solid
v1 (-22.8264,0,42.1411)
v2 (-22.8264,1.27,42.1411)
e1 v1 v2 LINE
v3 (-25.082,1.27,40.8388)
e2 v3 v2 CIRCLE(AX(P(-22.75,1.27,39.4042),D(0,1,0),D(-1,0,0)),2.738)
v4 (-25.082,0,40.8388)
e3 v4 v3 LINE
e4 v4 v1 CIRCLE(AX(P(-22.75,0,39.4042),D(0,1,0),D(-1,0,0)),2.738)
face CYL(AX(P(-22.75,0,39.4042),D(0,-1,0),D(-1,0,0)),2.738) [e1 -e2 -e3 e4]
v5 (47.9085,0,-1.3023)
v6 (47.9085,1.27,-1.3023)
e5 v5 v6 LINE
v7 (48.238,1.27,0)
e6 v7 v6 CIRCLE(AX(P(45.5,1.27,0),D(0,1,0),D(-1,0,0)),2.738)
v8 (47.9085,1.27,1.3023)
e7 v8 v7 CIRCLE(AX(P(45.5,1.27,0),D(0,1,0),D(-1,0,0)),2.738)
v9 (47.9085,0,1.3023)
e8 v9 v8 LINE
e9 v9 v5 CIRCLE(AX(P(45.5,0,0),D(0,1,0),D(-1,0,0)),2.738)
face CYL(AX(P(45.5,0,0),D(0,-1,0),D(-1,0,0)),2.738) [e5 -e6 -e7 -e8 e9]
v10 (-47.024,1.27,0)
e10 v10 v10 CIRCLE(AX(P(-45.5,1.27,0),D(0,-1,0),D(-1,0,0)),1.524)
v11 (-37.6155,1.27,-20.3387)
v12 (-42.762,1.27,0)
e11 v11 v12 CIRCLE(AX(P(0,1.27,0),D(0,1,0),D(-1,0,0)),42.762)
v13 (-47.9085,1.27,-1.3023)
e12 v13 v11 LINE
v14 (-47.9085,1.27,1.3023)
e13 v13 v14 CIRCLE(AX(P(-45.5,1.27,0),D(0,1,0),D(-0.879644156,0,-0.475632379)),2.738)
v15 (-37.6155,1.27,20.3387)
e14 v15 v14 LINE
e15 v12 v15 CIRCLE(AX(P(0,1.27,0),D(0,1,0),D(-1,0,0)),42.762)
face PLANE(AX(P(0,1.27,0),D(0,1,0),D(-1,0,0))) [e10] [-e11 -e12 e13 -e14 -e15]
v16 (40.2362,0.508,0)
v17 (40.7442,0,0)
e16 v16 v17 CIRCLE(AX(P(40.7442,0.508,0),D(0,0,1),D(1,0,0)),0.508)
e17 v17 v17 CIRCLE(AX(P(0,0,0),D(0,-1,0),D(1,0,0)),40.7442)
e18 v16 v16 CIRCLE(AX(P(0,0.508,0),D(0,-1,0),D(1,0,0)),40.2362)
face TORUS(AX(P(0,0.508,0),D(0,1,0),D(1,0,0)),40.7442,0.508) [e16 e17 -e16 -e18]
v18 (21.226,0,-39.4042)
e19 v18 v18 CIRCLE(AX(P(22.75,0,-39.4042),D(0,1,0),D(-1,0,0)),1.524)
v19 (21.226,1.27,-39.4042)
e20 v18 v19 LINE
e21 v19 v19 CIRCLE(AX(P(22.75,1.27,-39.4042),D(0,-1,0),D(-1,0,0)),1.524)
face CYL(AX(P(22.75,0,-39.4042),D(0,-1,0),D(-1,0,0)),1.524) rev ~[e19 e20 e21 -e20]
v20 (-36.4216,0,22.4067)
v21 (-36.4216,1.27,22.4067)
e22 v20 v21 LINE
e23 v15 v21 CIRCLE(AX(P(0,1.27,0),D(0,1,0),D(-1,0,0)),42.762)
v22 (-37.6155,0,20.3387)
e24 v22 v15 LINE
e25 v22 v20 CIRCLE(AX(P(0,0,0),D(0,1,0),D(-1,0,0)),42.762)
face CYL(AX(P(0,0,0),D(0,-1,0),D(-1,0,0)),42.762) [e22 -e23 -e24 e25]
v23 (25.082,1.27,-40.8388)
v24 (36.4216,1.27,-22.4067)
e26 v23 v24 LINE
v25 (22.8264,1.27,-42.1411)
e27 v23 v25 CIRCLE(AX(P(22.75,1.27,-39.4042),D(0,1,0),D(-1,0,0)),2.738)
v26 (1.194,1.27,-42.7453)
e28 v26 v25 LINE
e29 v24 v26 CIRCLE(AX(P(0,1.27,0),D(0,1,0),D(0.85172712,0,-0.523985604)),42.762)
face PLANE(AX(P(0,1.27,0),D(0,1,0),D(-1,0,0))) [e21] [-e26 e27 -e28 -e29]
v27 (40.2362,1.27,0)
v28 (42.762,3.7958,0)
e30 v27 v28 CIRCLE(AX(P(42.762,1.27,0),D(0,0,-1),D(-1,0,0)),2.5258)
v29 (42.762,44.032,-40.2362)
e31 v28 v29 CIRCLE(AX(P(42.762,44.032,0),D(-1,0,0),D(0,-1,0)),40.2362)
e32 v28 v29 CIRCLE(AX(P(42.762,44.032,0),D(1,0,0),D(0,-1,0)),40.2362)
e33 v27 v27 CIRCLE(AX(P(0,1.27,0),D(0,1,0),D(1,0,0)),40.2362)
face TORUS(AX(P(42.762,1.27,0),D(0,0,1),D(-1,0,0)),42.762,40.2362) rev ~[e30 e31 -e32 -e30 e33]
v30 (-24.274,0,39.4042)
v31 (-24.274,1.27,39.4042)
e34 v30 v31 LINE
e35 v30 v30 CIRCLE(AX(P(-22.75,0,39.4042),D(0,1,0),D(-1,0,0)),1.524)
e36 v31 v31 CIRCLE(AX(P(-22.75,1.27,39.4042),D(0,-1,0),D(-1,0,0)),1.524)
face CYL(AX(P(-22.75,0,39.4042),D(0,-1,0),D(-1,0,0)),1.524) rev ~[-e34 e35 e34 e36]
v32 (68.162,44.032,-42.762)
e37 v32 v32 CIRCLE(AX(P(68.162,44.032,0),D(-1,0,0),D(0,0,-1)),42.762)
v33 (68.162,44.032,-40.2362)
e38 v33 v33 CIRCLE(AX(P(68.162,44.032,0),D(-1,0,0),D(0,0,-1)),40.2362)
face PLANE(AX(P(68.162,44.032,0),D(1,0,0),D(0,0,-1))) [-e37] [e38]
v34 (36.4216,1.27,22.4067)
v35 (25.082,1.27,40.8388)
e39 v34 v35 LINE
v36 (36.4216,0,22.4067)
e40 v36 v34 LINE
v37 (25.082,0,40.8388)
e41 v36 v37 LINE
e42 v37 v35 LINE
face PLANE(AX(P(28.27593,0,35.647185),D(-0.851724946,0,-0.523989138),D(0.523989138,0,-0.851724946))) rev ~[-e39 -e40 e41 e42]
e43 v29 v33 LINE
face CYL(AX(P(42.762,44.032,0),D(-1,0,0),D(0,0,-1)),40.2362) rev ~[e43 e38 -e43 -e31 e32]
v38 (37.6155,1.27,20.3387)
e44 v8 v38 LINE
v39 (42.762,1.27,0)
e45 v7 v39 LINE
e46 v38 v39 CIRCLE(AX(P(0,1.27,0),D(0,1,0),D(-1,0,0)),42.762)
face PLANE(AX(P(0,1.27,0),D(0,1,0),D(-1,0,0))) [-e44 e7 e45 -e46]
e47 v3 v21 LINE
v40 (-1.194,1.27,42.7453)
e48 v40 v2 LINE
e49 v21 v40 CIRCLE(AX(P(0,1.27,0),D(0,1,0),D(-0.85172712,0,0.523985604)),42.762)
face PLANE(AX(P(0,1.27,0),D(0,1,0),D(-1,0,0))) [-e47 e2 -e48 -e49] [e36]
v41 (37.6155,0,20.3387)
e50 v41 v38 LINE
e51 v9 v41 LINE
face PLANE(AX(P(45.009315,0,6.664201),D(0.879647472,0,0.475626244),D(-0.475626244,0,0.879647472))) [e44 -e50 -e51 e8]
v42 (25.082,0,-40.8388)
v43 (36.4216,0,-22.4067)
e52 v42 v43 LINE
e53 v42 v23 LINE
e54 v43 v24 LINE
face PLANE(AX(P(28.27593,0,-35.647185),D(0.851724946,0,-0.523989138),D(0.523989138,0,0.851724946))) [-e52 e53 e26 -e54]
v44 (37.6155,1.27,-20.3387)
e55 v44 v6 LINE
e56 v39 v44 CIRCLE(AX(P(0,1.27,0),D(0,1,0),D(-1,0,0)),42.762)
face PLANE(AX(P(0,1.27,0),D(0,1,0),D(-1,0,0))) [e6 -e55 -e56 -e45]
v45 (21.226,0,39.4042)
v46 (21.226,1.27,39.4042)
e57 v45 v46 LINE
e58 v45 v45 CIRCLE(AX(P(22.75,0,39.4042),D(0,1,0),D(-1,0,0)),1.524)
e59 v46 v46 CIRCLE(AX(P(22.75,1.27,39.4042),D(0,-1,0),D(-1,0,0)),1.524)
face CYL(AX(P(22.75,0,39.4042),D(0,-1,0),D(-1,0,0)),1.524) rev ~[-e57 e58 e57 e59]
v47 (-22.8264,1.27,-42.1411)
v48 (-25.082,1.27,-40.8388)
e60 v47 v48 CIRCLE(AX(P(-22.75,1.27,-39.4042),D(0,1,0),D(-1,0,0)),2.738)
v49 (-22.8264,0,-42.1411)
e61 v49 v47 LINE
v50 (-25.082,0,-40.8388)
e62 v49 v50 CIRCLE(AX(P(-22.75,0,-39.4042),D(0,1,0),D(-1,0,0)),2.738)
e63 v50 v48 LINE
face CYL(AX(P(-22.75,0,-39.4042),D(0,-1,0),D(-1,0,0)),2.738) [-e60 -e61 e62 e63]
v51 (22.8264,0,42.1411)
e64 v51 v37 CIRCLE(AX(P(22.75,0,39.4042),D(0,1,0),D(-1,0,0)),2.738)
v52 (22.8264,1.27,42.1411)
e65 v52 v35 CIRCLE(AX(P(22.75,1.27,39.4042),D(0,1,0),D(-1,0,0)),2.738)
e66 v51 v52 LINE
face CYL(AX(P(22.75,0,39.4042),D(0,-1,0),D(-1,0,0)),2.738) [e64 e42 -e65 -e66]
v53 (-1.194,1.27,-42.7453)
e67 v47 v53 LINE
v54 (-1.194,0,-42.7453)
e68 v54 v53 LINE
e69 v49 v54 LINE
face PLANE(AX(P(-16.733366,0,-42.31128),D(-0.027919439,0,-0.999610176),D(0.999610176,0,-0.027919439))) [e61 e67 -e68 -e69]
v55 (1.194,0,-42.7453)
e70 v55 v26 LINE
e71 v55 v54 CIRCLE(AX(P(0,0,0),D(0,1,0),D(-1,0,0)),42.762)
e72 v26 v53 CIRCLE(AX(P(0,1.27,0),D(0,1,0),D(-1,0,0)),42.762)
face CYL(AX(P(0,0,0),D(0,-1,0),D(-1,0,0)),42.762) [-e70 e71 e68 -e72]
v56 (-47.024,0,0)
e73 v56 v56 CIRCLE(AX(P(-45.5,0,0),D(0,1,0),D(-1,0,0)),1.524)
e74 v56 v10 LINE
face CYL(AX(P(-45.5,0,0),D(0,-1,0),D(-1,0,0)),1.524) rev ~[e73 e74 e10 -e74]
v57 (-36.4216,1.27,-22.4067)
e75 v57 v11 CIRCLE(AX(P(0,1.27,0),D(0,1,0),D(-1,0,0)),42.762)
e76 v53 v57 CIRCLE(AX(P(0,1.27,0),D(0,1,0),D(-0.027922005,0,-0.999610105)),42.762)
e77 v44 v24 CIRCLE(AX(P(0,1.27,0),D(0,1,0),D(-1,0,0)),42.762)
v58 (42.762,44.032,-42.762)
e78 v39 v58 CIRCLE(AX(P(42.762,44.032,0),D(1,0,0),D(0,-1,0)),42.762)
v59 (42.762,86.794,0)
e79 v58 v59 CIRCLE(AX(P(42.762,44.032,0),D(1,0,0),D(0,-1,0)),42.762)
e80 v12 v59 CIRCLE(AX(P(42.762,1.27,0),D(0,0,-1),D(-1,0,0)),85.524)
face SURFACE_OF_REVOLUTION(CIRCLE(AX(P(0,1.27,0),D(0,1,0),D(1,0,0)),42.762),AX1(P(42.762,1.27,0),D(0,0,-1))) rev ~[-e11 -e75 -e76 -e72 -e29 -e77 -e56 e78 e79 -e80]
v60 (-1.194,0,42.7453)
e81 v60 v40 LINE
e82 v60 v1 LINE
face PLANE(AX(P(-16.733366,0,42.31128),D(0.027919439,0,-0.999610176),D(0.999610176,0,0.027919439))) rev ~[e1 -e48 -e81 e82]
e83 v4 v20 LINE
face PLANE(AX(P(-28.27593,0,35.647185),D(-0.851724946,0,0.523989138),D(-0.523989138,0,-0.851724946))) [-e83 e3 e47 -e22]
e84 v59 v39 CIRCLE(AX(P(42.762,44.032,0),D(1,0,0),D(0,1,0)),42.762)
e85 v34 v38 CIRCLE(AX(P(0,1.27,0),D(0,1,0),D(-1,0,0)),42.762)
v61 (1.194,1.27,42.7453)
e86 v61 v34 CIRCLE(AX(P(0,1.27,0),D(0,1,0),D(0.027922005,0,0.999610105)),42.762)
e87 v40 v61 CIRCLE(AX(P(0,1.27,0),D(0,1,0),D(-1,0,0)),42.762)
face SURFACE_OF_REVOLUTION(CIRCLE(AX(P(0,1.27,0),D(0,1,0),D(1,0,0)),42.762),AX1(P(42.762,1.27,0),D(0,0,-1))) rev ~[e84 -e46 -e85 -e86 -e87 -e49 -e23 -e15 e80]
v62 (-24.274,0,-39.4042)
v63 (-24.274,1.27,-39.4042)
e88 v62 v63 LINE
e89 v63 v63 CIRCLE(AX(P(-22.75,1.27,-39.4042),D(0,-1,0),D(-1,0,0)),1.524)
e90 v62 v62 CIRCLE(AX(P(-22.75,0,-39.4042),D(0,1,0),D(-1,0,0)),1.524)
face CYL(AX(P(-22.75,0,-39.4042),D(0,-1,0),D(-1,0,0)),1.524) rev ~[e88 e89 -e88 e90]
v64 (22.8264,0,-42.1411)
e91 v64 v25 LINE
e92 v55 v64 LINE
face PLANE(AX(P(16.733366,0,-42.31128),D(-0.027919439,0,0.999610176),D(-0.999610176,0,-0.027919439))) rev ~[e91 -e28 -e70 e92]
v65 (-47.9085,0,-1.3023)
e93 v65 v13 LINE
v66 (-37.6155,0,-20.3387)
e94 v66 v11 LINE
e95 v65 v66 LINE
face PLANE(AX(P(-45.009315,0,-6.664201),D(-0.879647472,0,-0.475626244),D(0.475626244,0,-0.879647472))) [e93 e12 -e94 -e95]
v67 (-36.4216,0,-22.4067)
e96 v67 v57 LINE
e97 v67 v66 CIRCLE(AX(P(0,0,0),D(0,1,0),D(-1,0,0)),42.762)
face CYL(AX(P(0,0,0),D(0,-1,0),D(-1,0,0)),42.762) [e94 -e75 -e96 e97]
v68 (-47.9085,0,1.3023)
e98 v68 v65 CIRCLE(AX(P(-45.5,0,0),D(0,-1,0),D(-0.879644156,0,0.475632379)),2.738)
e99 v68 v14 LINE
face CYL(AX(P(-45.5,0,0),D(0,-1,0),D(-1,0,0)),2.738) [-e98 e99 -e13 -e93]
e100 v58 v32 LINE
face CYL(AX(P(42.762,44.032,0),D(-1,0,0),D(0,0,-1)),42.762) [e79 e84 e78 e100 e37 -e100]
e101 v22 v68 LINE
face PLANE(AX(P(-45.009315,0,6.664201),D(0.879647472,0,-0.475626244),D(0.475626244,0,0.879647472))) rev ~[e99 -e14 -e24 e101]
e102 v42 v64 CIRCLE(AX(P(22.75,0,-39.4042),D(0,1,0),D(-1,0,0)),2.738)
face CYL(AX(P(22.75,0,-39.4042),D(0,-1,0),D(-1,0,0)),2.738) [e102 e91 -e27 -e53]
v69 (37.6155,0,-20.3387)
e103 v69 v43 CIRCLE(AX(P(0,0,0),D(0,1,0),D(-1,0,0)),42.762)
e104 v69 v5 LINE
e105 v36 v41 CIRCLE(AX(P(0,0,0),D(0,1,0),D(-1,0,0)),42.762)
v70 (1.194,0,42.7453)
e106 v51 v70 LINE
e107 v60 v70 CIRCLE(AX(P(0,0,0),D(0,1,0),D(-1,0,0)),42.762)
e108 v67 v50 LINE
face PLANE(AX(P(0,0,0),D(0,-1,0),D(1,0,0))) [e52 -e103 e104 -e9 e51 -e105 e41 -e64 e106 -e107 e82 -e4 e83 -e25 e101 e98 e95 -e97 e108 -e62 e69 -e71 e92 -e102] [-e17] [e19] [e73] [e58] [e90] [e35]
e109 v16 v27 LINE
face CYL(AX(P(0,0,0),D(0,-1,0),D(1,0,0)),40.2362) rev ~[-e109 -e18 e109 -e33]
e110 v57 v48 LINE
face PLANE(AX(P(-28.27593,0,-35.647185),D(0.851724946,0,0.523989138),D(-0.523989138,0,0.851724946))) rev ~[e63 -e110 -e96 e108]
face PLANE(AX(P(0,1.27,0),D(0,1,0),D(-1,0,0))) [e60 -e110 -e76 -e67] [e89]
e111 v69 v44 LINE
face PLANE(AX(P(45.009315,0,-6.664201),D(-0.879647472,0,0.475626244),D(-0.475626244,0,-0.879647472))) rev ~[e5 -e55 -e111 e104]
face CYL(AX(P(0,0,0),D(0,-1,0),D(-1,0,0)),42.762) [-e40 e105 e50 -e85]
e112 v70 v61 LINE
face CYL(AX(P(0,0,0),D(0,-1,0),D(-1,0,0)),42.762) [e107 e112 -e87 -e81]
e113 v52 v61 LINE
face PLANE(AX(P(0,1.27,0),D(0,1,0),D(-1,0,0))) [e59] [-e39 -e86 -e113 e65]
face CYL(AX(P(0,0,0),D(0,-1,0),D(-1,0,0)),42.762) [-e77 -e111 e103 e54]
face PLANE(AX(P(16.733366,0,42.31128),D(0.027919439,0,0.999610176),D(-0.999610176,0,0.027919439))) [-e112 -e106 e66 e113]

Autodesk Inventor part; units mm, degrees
ref_plane "YZ Plane" through (0, 0, 0) normal (1, 0, 0) x (0, 1, 0)
ref_plane "XZ Plane" through (0, 0, 0) normal (0, 1, 0) x (-1, 0, 0)
ref_plane "XY Plane" through (0, 0, 0) normal (0, 0, 1) x (1, 0, 0)
sketch "Sketch1" plane through (0, 0, 0) normal (0, 1, 0) x (-1, 0, 0)
  circle A0 centre (0, 0) radius 42
  circle A1 centre (0, 0) radius 45.5
  circle A2 centre (45.5, 0) radius 1.524
  circle A3 centre (0, 0) radius 40.7442
  circle A4 centre (0, 0) radius 42.762
  line L0 (40.7442, 0) -> (42.762, 0)
  circle A5 centre (45.5, 0) radius 2.738
  line L1 (47.9085, 1.3023) -> (37.6155, 20.3387)
  line L2 (47.9085, -1.3023) -> (37.6155, -20.3387)
  line L3 (25.082, 40.8388) -> (36.4216, 22.4067)
  circle A6 centre (22.75, 39.4042) radius 2.738
  circle A7 centre (22.75, 39.4042) radius 1.524
  line L4 (22.8264, 42.1411) -> (1.194, 42.7453)
  line L5 (-22.8264, 42.1411) -> (-1.194, 42.7453)
  circle A8 centre (-22.75, 39.4042) radius 2.738
  circle A9 centre (-22.75, 39.4042) radius 1.524
  line L6 (-25.082, 40.8388) -> (-36.4216, 22.4067)
  line L7 (-47.9085, 1.3023) -> (-37.6155, 20.3387)
  circle A10 centre (-45.5, 0) radius 2.738
  circle A11 centre (-45.5, 0) radius 1.524
  line L8 (-47.9085, -1.3023) -> (-37.6155, -20.3387)
  line L9 (-25.082, -40.8388) -> (-36.4216, -22.4067)
  circle A12 centre (-22.75, -39.4042) radius 2.738
  circle A13 centre (-22.75, -39.4042) radius 1.524
  line L10 (-22.8264, -42.1411) -> (-1.194, -42.7453)
  line L11 (22.8264, -42.1411) -> (1.194, -42.7453)
  circle A14 centre (22.75, -39.4042) radius 2.738
  circle A15 centre (22.75, -39.4042) radius 1.524
  line L12 (25.082, -40.8388) -> (36.4216, -22.4067)
  point P0 (21.381, 37.033)
  point P1 (-21.381, 37.033)
  point P2 (-42.762, 0)
  point P3 (-21.381, -37.033)
  point P4 (21.381, -37.033)
  point P5 (-1.194, 42.7453)
  point P6 (-1.194, -42.7453)
  point P7 (1.194, -42.7453)
  dimension "d1" = 91
  dimension "d0" = 84
  dimension "d2" = 3.048
  dimension "d3" = 0.762
  dimension "d6" = 360
extrude "Extrusion1" add sketch "Sketch1" along normal blind 1.27 contours A0 | A2 A1 A5 | A1 A5 A2 | A5 A4 L1 A1 | A1 L1 A5 | A5 L2 A1 | A1 L2 A4 A5 | A4 | L3 A4 A6 A1 | A1 A6 L3 | L12 A14 A1 | A1 A14 A4 L12 | A6 A1 A7 | A1 A7 A6 | A14 A1 A15 | A1 A15 A14 | A4 L4 A1 A6 | A6 A1 L4 | A14 A1 L11 A4 | L11 A1 A14 | A4 A8 A1 L5 | A1 A8 L5 | L10 A1 A12 A4 | L10 A12 A1 | A4 L6 A1 A8 | A8 A1 A9 | A1 A9 A8 | A12 A1 L9 A4 | A12 A1 A13 | A12 A1 A13 | A1 L6 A8 | A12 L9 A1 | A4 A10 A1 L7 | L8 A1 A10 A4 | A10 A1 A11 | A1 A10 L7 | L8 A10 A1 | A1 A11 A10
sketch "Sketch2" plane through (0, 1.27, 0) normal (0, 1, 0) x (1, 0, 0)
  circle A0 centre (0, 0) radius 40.7442
  circle A1 centre (-45.5, 0) radius 1.524 projected
  circle A2 centre (-45.5, 0) radius 2.738
  circle A3 centre (0, 0) radius 42.762
  circle A4 centre (0, 0) radius 40.2362
  line L0 (42.762, -52.0415) -> (42.762, 67.6033)
  dimension "d10" = 0.508
revolve "Revolution1" add sketch "Sketch2" angle 90 about axis through (42.762, 1.27, 52.0415) along (0, 0, -1) contours A0 | A3
sketch "Sketch3" plane through (42.762, 44.032, 0) normal (1, 0, 0) x (0, 0, -1)
  circle A0 centre (0, 0) radius 42.762
  line L0 (-42.762, -42.762) -> (-42.762, 0) projected
  circle A1 centre (0, 0) radius 40.2362
  line L1 (-40.2362, -42.762) -> (-40.2362, 0) projected
  point P0 (0, -44.032)
extrude "Extrusion2" add sketch "Sketch3" along normal blind 25.4
sketch "Sketch4" plane through (0, 0, 0) normal (0, -1, 0) x (1, 0, 0)
  arc A0 (43.976, 0) -> (47.024, 0) centre (45.5, 0) ccw projected
  circle A1 centre (45.5, 0) radius 1.524
  point P0 (0, 0)
  point P1 (43.976, 0)
extrude "Extrusion3" add sketch "Sketch4" against normal up to surface (1.27 mm away)
sketch "Sketch5" plane through (0, 0, 0) normal (0, -1, 0) x (1, 0, 0)
  circle A0 centre (0, 0) radius 40.2362
  circle A1 centre (0, 0) radius 40.7442
extrude "Extrusion4" add sketch "Sketch5" against normal up to surface (1.27 mm away)
fillet "Fillet1" radius 0.508 1 edges at (-40.2362, 0, 0)
properties part number "Dispenser Tip_3DPrint"
